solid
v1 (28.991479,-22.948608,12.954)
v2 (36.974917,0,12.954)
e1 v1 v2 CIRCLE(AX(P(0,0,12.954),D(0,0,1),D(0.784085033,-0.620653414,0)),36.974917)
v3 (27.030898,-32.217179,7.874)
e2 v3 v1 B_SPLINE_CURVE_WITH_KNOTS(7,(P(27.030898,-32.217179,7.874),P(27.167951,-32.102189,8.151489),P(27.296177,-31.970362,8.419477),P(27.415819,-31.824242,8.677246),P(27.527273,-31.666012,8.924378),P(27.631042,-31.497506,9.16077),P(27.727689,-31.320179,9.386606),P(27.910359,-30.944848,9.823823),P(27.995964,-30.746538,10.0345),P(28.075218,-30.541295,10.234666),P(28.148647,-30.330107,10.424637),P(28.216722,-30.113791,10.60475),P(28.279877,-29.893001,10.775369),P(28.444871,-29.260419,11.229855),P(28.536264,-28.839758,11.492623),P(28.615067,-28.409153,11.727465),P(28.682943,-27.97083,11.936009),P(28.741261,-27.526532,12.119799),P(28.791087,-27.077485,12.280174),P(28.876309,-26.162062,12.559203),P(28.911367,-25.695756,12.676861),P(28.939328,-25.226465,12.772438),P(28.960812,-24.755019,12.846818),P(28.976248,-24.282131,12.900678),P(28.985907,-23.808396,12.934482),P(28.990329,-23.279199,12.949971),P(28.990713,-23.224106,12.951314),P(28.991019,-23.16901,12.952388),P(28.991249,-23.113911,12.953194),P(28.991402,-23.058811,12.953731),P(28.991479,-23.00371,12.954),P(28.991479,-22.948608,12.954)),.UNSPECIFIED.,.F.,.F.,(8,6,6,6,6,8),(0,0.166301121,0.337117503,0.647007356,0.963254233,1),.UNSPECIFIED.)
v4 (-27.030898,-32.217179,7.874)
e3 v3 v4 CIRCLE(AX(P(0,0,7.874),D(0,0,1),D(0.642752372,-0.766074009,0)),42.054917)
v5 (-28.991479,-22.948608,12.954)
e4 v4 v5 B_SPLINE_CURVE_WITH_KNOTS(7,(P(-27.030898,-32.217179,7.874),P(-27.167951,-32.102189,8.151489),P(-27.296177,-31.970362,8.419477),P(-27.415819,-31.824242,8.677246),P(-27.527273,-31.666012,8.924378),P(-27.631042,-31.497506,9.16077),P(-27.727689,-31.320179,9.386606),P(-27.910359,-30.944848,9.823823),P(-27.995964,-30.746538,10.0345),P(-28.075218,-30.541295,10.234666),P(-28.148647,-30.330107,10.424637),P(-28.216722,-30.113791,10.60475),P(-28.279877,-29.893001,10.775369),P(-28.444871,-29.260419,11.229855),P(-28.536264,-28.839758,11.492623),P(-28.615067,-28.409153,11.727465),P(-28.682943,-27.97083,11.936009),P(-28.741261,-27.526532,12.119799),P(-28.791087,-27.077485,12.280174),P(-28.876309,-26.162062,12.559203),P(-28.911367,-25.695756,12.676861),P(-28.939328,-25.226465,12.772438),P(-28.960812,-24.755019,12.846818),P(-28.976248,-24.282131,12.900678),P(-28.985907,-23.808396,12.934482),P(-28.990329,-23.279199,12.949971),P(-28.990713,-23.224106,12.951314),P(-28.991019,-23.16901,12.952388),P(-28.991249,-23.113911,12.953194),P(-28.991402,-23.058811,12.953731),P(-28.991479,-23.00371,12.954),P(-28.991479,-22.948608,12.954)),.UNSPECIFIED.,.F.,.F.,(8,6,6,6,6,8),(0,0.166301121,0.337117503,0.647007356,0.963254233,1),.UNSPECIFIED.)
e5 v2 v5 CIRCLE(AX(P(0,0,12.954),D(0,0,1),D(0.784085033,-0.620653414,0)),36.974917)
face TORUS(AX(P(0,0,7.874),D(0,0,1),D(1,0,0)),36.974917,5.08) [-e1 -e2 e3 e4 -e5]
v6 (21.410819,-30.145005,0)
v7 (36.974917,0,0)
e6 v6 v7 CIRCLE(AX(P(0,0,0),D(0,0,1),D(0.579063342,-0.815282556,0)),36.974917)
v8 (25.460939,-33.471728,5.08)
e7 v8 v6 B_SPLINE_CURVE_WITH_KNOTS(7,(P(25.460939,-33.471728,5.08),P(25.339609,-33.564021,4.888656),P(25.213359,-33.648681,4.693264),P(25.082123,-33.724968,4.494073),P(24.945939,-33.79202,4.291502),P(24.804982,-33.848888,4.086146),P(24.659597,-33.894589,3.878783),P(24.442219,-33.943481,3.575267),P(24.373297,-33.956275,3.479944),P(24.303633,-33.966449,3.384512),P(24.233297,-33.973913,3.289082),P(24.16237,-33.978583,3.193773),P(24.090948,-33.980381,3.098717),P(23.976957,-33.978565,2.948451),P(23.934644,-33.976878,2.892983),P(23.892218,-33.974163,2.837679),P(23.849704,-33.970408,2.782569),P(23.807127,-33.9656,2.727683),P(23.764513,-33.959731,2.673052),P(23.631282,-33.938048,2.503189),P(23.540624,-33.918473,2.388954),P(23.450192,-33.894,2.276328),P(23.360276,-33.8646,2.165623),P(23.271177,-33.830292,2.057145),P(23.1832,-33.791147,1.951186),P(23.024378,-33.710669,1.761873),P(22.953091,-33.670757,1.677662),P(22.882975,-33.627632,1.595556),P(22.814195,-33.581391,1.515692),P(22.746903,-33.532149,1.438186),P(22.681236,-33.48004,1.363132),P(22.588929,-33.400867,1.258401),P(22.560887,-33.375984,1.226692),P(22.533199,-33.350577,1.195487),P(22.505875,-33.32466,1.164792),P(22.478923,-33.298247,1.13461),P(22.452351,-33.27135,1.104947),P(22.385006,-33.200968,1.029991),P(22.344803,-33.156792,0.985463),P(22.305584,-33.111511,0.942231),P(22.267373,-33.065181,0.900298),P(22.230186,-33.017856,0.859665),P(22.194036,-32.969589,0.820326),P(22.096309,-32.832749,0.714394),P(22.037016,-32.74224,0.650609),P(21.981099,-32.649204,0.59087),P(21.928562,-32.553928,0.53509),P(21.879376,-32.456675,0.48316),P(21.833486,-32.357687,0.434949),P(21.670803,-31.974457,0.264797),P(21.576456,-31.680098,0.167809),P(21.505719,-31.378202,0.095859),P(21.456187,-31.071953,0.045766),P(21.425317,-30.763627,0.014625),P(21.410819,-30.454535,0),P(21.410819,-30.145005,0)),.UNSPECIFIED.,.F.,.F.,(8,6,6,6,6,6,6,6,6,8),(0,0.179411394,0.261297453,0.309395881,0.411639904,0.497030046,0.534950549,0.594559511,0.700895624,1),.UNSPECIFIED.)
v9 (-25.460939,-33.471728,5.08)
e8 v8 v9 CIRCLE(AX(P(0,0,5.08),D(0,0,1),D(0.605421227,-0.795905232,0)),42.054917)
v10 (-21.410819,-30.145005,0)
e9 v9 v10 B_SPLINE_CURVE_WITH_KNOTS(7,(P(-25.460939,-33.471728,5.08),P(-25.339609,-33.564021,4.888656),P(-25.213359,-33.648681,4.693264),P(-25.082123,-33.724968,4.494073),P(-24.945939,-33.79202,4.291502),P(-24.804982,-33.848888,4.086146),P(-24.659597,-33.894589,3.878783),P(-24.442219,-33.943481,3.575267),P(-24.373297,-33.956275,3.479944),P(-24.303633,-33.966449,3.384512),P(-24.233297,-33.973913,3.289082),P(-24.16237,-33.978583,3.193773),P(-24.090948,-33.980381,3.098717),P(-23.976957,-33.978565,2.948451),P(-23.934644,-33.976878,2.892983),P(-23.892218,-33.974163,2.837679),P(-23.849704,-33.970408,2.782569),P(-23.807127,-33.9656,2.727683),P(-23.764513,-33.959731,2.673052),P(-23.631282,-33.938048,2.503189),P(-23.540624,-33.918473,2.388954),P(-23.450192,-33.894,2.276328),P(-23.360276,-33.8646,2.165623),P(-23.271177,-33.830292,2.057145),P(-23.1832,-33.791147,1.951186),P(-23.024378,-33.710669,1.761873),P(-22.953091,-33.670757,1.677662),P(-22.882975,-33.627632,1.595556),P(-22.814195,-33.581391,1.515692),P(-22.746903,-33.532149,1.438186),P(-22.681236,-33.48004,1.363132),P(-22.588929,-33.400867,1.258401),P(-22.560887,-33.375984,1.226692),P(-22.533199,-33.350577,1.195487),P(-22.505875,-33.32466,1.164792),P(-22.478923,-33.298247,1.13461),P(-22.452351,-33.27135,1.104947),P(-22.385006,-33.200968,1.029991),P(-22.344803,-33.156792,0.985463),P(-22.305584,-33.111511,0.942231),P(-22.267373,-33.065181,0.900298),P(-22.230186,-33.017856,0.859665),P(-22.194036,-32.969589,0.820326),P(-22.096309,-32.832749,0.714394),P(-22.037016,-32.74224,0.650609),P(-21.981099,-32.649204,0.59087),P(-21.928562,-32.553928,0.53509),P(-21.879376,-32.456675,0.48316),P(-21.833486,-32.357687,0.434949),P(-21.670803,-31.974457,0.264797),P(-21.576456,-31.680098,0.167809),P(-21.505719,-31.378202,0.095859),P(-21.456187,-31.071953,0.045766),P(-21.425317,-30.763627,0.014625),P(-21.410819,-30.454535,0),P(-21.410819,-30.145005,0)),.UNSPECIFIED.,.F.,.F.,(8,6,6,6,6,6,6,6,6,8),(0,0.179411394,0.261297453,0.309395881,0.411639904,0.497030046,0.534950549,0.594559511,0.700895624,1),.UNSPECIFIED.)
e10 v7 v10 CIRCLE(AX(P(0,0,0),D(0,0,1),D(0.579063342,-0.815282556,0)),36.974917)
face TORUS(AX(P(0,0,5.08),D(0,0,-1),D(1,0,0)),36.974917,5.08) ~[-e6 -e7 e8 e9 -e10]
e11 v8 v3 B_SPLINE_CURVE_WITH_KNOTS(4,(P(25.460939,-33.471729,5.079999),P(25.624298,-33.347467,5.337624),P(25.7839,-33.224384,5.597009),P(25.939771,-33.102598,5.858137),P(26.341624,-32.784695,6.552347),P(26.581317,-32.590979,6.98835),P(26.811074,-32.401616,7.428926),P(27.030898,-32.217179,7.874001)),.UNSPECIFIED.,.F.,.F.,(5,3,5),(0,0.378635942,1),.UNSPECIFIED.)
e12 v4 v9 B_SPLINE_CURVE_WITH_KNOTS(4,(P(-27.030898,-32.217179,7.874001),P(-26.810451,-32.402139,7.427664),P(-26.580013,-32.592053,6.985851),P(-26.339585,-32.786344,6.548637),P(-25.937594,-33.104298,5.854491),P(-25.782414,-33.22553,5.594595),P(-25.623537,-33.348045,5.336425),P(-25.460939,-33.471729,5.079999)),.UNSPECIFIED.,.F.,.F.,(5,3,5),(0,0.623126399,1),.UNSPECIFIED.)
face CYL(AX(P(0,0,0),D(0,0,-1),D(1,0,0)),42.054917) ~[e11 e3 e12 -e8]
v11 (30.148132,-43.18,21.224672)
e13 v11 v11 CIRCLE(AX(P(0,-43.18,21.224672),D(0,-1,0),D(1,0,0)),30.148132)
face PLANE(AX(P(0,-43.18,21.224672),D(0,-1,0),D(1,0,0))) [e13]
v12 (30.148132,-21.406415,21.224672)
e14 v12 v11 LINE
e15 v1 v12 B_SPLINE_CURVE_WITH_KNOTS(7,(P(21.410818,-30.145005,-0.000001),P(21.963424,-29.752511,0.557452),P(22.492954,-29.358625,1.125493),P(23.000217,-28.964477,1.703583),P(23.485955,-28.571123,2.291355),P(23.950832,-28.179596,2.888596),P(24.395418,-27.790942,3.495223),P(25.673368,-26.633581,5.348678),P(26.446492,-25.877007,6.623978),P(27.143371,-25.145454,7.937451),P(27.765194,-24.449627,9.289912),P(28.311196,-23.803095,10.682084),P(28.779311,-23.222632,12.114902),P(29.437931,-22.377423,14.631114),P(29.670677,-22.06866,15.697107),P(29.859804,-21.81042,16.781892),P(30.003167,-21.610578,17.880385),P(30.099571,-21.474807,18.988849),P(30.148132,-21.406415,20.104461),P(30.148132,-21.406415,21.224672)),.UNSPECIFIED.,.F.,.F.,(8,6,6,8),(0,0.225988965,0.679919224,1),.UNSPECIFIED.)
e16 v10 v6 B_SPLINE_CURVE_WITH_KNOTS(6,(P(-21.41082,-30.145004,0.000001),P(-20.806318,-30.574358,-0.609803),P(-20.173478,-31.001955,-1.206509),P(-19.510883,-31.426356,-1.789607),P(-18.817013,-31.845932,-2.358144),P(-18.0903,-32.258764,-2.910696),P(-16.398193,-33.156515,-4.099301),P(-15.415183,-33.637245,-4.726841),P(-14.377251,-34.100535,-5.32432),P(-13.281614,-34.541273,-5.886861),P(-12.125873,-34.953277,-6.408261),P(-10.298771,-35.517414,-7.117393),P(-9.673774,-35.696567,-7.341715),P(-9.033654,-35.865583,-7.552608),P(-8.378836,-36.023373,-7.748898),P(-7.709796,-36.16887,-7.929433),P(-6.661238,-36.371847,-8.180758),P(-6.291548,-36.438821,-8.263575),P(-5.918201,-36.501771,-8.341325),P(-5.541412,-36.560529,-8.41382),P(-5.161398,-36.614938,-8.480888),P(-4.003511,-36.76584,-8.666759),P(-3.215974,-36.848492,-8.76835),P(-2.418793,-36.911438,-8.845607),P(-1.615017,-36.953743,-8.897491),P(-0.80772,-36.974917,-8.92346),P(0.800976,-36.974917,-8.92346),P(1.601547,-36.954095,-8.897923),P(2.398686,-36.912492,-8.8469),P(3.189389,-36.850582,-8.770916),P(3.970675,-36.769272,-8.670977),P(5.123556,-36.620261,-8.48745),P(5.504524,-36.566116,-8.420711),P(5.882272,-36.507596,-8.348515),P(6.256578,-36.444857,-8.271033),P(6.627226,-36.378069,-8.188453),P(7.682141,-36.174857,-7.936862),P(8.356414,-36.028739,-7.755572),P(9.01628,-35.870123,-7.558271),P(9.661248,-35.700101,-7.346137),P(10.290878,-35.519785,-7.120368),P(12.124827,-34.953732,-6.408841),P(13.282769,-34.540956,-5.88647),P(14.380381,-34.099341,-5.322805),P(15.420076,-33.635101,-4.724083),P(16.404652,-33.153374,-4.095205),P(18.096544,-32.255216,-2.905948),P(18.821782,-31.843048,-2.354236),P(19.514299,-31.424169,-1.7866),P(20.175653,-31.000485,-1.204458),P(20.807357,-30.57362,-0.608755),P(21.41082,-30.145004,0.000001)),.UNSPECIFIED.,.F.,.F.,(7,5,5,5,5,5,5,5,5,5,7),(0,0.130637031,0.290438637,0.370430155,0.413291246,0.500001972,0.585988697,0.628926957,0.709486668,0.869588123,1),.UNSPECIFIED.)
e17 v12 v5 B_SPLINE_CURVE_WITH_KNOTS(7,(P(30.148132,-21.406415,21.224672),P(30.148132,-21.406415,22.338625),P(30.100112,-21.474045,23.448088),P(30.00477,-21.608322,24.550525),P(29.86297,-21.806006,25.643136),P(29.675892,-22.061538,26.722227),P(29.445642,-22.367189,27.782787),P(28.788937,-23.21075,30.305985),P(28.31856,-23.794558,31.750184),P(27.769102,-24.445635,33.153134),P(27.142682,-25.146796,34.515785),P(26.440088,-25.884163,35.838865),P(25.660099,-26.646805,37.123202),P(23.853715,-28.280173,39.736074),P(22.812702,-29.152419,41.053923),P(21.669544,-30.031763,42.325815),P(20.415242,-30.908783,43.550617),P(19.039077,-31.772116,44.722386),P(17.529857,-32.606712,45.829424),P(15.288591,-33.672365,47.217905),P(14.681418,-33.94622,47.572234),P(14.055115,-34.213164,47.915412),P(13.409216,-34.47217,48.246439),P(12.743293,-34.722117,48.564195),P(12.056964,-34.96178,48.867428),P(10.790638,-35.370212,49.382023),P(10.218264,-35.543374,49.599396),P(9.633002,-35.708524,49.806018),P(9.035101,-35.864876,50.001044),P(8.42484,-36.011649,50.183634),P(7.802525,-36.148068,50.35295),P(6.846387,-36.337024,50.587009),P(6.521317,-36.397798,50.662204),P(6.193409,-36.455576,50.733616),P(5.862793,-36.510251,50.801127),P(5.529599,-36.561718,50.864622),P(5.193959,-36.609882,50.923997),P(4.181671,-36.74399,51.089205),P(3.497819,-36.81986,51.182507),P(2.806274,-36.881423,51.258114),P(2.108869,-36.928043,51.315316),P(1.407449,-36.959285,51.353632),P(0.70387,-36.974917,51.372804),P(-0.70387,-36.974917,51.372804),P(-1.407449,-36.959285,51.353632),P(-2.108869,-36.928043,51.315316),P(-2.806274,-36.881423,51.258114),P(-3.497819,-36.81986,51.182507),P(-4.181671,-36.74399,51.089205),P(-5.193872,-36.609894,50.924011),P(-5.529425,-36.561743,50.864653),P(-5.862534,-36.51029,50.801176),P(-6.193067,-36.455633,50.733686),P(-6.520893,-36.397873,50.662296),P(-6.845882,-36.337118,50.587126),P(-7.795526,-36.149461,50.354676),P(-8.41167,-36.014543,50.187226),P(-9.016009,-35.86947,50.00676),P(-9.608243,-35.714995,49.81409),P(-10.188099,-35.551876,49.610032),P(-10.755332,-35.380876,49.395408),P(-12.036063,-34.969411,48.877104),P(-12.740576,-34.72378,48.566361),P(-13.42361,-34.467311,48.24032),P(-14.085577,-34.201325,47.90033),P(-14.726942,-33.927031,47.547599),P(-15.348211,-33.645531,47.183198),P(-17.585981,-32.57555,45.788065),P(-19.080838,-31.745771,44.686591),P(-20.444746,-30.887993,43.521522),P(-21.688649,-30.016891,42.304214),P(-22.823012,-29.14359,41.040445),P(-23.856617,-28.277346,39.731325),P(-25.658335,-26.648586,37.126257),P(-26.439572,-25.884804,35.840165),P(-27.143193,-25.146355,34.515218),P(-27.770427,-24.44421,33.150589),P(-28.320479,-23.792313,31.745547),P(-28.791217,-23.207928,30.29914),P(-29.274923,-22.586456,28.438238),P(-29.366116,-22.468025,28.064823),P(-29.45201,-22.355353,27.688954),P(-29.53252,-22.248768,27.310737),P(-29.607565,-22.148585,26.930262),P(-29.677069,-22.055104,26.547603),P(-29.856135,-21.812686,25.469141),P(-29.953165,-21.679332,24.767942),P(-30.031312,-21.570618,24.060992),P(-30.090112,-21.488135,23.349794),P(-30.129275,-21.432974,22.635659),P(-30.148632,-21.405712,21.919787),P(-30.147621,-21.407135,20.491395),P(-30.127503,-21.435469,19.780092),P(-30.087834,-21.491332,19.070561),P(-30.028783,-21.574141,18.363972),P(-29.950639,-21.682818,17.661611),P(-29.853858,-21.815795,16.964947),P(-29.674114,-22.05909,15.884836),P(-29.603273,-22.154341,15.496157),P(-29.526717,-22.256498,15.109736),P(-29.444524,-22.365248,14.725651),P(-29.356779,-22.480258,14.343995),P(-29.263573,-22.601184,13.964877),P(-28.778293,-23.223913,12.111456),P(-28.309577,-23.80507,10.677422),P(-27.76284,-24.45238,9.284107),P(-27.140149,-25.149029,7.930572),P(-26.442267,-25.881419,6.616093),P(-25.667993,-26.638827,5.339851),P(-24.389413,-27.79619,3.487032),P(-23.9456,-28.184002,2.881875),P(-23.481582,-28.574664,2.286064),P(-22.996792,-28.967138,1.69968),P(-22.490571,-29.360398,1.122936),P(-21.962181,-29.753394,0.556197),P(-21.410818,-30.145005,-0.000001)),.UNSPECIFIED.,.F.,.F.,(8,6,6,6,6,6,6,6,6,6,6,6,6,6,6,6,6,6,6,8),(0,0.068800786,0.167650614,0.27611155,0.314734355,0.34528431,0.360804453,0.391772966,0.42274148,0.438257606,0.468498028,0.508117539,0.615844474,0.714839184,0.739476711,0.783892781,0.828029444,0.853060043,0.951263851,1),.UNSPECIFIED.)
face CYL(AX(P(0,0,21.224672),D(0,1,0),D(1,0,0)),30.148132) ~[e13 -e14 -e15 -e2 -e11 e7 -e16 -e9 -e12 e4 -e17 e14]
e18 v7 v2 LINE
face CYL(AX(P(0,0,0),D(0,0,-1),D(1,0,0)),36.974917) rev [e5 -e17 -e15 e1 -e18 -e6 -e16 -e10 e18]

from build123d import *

# Parameters (mm, degrees)
F0_R     = 42.0549170166
F1_DEPTH = 12.954
F2_R     = 5.08
F4_R     = 30.1481321403
F5_DEPTH = 43.18
F6_R     = 36.9749170166
F7_DEPTH = 77.47
F8_R     = 36.9749170166
F9_DEPTH = 29.464


# Not quite as in the source:
# - a feature of the source that left no trace in its solid (it failed there, or was rolled back) is left out


with BuildPart() as f1:
    # F0 (on Top) → F1 (new body)
    with BuildSketch(Plane.XY):
        Circle(F0_R)
    extrude(amount=F1_DEPTH)

    # F2
    f2_edges = [f1.edges().sort_by_distance(p)[0] for p in [
        (-42.054917, 0, 12.954),
        (-42.054917, 0, 0),
    ]]
    fillet(f2_edges, radius=F2_R)

    # F4 (on Front) → F5 (join)
    with BuildSketch(Plane.XZ):
        with Locations((0, 21.2246719748)):
            Circle(F4_R)
    extrude(amount=F5_DEPTH)

    # F6 (on Top) → F7 (cut)
    with BuildSketch(Plane.XY):
        Circle(F6_R)
    extrude(amount=F7_DEPTH, mode=Mode.SUBTRACT)

    # F8 (on Top) → F9 (cut)
    with BuildSketch(Plane.XY):
        Circle(F8_R)
    extrude(amount=-F9_DEPTH, mode=Mode.SUBTRACT)


solid = f1.part
